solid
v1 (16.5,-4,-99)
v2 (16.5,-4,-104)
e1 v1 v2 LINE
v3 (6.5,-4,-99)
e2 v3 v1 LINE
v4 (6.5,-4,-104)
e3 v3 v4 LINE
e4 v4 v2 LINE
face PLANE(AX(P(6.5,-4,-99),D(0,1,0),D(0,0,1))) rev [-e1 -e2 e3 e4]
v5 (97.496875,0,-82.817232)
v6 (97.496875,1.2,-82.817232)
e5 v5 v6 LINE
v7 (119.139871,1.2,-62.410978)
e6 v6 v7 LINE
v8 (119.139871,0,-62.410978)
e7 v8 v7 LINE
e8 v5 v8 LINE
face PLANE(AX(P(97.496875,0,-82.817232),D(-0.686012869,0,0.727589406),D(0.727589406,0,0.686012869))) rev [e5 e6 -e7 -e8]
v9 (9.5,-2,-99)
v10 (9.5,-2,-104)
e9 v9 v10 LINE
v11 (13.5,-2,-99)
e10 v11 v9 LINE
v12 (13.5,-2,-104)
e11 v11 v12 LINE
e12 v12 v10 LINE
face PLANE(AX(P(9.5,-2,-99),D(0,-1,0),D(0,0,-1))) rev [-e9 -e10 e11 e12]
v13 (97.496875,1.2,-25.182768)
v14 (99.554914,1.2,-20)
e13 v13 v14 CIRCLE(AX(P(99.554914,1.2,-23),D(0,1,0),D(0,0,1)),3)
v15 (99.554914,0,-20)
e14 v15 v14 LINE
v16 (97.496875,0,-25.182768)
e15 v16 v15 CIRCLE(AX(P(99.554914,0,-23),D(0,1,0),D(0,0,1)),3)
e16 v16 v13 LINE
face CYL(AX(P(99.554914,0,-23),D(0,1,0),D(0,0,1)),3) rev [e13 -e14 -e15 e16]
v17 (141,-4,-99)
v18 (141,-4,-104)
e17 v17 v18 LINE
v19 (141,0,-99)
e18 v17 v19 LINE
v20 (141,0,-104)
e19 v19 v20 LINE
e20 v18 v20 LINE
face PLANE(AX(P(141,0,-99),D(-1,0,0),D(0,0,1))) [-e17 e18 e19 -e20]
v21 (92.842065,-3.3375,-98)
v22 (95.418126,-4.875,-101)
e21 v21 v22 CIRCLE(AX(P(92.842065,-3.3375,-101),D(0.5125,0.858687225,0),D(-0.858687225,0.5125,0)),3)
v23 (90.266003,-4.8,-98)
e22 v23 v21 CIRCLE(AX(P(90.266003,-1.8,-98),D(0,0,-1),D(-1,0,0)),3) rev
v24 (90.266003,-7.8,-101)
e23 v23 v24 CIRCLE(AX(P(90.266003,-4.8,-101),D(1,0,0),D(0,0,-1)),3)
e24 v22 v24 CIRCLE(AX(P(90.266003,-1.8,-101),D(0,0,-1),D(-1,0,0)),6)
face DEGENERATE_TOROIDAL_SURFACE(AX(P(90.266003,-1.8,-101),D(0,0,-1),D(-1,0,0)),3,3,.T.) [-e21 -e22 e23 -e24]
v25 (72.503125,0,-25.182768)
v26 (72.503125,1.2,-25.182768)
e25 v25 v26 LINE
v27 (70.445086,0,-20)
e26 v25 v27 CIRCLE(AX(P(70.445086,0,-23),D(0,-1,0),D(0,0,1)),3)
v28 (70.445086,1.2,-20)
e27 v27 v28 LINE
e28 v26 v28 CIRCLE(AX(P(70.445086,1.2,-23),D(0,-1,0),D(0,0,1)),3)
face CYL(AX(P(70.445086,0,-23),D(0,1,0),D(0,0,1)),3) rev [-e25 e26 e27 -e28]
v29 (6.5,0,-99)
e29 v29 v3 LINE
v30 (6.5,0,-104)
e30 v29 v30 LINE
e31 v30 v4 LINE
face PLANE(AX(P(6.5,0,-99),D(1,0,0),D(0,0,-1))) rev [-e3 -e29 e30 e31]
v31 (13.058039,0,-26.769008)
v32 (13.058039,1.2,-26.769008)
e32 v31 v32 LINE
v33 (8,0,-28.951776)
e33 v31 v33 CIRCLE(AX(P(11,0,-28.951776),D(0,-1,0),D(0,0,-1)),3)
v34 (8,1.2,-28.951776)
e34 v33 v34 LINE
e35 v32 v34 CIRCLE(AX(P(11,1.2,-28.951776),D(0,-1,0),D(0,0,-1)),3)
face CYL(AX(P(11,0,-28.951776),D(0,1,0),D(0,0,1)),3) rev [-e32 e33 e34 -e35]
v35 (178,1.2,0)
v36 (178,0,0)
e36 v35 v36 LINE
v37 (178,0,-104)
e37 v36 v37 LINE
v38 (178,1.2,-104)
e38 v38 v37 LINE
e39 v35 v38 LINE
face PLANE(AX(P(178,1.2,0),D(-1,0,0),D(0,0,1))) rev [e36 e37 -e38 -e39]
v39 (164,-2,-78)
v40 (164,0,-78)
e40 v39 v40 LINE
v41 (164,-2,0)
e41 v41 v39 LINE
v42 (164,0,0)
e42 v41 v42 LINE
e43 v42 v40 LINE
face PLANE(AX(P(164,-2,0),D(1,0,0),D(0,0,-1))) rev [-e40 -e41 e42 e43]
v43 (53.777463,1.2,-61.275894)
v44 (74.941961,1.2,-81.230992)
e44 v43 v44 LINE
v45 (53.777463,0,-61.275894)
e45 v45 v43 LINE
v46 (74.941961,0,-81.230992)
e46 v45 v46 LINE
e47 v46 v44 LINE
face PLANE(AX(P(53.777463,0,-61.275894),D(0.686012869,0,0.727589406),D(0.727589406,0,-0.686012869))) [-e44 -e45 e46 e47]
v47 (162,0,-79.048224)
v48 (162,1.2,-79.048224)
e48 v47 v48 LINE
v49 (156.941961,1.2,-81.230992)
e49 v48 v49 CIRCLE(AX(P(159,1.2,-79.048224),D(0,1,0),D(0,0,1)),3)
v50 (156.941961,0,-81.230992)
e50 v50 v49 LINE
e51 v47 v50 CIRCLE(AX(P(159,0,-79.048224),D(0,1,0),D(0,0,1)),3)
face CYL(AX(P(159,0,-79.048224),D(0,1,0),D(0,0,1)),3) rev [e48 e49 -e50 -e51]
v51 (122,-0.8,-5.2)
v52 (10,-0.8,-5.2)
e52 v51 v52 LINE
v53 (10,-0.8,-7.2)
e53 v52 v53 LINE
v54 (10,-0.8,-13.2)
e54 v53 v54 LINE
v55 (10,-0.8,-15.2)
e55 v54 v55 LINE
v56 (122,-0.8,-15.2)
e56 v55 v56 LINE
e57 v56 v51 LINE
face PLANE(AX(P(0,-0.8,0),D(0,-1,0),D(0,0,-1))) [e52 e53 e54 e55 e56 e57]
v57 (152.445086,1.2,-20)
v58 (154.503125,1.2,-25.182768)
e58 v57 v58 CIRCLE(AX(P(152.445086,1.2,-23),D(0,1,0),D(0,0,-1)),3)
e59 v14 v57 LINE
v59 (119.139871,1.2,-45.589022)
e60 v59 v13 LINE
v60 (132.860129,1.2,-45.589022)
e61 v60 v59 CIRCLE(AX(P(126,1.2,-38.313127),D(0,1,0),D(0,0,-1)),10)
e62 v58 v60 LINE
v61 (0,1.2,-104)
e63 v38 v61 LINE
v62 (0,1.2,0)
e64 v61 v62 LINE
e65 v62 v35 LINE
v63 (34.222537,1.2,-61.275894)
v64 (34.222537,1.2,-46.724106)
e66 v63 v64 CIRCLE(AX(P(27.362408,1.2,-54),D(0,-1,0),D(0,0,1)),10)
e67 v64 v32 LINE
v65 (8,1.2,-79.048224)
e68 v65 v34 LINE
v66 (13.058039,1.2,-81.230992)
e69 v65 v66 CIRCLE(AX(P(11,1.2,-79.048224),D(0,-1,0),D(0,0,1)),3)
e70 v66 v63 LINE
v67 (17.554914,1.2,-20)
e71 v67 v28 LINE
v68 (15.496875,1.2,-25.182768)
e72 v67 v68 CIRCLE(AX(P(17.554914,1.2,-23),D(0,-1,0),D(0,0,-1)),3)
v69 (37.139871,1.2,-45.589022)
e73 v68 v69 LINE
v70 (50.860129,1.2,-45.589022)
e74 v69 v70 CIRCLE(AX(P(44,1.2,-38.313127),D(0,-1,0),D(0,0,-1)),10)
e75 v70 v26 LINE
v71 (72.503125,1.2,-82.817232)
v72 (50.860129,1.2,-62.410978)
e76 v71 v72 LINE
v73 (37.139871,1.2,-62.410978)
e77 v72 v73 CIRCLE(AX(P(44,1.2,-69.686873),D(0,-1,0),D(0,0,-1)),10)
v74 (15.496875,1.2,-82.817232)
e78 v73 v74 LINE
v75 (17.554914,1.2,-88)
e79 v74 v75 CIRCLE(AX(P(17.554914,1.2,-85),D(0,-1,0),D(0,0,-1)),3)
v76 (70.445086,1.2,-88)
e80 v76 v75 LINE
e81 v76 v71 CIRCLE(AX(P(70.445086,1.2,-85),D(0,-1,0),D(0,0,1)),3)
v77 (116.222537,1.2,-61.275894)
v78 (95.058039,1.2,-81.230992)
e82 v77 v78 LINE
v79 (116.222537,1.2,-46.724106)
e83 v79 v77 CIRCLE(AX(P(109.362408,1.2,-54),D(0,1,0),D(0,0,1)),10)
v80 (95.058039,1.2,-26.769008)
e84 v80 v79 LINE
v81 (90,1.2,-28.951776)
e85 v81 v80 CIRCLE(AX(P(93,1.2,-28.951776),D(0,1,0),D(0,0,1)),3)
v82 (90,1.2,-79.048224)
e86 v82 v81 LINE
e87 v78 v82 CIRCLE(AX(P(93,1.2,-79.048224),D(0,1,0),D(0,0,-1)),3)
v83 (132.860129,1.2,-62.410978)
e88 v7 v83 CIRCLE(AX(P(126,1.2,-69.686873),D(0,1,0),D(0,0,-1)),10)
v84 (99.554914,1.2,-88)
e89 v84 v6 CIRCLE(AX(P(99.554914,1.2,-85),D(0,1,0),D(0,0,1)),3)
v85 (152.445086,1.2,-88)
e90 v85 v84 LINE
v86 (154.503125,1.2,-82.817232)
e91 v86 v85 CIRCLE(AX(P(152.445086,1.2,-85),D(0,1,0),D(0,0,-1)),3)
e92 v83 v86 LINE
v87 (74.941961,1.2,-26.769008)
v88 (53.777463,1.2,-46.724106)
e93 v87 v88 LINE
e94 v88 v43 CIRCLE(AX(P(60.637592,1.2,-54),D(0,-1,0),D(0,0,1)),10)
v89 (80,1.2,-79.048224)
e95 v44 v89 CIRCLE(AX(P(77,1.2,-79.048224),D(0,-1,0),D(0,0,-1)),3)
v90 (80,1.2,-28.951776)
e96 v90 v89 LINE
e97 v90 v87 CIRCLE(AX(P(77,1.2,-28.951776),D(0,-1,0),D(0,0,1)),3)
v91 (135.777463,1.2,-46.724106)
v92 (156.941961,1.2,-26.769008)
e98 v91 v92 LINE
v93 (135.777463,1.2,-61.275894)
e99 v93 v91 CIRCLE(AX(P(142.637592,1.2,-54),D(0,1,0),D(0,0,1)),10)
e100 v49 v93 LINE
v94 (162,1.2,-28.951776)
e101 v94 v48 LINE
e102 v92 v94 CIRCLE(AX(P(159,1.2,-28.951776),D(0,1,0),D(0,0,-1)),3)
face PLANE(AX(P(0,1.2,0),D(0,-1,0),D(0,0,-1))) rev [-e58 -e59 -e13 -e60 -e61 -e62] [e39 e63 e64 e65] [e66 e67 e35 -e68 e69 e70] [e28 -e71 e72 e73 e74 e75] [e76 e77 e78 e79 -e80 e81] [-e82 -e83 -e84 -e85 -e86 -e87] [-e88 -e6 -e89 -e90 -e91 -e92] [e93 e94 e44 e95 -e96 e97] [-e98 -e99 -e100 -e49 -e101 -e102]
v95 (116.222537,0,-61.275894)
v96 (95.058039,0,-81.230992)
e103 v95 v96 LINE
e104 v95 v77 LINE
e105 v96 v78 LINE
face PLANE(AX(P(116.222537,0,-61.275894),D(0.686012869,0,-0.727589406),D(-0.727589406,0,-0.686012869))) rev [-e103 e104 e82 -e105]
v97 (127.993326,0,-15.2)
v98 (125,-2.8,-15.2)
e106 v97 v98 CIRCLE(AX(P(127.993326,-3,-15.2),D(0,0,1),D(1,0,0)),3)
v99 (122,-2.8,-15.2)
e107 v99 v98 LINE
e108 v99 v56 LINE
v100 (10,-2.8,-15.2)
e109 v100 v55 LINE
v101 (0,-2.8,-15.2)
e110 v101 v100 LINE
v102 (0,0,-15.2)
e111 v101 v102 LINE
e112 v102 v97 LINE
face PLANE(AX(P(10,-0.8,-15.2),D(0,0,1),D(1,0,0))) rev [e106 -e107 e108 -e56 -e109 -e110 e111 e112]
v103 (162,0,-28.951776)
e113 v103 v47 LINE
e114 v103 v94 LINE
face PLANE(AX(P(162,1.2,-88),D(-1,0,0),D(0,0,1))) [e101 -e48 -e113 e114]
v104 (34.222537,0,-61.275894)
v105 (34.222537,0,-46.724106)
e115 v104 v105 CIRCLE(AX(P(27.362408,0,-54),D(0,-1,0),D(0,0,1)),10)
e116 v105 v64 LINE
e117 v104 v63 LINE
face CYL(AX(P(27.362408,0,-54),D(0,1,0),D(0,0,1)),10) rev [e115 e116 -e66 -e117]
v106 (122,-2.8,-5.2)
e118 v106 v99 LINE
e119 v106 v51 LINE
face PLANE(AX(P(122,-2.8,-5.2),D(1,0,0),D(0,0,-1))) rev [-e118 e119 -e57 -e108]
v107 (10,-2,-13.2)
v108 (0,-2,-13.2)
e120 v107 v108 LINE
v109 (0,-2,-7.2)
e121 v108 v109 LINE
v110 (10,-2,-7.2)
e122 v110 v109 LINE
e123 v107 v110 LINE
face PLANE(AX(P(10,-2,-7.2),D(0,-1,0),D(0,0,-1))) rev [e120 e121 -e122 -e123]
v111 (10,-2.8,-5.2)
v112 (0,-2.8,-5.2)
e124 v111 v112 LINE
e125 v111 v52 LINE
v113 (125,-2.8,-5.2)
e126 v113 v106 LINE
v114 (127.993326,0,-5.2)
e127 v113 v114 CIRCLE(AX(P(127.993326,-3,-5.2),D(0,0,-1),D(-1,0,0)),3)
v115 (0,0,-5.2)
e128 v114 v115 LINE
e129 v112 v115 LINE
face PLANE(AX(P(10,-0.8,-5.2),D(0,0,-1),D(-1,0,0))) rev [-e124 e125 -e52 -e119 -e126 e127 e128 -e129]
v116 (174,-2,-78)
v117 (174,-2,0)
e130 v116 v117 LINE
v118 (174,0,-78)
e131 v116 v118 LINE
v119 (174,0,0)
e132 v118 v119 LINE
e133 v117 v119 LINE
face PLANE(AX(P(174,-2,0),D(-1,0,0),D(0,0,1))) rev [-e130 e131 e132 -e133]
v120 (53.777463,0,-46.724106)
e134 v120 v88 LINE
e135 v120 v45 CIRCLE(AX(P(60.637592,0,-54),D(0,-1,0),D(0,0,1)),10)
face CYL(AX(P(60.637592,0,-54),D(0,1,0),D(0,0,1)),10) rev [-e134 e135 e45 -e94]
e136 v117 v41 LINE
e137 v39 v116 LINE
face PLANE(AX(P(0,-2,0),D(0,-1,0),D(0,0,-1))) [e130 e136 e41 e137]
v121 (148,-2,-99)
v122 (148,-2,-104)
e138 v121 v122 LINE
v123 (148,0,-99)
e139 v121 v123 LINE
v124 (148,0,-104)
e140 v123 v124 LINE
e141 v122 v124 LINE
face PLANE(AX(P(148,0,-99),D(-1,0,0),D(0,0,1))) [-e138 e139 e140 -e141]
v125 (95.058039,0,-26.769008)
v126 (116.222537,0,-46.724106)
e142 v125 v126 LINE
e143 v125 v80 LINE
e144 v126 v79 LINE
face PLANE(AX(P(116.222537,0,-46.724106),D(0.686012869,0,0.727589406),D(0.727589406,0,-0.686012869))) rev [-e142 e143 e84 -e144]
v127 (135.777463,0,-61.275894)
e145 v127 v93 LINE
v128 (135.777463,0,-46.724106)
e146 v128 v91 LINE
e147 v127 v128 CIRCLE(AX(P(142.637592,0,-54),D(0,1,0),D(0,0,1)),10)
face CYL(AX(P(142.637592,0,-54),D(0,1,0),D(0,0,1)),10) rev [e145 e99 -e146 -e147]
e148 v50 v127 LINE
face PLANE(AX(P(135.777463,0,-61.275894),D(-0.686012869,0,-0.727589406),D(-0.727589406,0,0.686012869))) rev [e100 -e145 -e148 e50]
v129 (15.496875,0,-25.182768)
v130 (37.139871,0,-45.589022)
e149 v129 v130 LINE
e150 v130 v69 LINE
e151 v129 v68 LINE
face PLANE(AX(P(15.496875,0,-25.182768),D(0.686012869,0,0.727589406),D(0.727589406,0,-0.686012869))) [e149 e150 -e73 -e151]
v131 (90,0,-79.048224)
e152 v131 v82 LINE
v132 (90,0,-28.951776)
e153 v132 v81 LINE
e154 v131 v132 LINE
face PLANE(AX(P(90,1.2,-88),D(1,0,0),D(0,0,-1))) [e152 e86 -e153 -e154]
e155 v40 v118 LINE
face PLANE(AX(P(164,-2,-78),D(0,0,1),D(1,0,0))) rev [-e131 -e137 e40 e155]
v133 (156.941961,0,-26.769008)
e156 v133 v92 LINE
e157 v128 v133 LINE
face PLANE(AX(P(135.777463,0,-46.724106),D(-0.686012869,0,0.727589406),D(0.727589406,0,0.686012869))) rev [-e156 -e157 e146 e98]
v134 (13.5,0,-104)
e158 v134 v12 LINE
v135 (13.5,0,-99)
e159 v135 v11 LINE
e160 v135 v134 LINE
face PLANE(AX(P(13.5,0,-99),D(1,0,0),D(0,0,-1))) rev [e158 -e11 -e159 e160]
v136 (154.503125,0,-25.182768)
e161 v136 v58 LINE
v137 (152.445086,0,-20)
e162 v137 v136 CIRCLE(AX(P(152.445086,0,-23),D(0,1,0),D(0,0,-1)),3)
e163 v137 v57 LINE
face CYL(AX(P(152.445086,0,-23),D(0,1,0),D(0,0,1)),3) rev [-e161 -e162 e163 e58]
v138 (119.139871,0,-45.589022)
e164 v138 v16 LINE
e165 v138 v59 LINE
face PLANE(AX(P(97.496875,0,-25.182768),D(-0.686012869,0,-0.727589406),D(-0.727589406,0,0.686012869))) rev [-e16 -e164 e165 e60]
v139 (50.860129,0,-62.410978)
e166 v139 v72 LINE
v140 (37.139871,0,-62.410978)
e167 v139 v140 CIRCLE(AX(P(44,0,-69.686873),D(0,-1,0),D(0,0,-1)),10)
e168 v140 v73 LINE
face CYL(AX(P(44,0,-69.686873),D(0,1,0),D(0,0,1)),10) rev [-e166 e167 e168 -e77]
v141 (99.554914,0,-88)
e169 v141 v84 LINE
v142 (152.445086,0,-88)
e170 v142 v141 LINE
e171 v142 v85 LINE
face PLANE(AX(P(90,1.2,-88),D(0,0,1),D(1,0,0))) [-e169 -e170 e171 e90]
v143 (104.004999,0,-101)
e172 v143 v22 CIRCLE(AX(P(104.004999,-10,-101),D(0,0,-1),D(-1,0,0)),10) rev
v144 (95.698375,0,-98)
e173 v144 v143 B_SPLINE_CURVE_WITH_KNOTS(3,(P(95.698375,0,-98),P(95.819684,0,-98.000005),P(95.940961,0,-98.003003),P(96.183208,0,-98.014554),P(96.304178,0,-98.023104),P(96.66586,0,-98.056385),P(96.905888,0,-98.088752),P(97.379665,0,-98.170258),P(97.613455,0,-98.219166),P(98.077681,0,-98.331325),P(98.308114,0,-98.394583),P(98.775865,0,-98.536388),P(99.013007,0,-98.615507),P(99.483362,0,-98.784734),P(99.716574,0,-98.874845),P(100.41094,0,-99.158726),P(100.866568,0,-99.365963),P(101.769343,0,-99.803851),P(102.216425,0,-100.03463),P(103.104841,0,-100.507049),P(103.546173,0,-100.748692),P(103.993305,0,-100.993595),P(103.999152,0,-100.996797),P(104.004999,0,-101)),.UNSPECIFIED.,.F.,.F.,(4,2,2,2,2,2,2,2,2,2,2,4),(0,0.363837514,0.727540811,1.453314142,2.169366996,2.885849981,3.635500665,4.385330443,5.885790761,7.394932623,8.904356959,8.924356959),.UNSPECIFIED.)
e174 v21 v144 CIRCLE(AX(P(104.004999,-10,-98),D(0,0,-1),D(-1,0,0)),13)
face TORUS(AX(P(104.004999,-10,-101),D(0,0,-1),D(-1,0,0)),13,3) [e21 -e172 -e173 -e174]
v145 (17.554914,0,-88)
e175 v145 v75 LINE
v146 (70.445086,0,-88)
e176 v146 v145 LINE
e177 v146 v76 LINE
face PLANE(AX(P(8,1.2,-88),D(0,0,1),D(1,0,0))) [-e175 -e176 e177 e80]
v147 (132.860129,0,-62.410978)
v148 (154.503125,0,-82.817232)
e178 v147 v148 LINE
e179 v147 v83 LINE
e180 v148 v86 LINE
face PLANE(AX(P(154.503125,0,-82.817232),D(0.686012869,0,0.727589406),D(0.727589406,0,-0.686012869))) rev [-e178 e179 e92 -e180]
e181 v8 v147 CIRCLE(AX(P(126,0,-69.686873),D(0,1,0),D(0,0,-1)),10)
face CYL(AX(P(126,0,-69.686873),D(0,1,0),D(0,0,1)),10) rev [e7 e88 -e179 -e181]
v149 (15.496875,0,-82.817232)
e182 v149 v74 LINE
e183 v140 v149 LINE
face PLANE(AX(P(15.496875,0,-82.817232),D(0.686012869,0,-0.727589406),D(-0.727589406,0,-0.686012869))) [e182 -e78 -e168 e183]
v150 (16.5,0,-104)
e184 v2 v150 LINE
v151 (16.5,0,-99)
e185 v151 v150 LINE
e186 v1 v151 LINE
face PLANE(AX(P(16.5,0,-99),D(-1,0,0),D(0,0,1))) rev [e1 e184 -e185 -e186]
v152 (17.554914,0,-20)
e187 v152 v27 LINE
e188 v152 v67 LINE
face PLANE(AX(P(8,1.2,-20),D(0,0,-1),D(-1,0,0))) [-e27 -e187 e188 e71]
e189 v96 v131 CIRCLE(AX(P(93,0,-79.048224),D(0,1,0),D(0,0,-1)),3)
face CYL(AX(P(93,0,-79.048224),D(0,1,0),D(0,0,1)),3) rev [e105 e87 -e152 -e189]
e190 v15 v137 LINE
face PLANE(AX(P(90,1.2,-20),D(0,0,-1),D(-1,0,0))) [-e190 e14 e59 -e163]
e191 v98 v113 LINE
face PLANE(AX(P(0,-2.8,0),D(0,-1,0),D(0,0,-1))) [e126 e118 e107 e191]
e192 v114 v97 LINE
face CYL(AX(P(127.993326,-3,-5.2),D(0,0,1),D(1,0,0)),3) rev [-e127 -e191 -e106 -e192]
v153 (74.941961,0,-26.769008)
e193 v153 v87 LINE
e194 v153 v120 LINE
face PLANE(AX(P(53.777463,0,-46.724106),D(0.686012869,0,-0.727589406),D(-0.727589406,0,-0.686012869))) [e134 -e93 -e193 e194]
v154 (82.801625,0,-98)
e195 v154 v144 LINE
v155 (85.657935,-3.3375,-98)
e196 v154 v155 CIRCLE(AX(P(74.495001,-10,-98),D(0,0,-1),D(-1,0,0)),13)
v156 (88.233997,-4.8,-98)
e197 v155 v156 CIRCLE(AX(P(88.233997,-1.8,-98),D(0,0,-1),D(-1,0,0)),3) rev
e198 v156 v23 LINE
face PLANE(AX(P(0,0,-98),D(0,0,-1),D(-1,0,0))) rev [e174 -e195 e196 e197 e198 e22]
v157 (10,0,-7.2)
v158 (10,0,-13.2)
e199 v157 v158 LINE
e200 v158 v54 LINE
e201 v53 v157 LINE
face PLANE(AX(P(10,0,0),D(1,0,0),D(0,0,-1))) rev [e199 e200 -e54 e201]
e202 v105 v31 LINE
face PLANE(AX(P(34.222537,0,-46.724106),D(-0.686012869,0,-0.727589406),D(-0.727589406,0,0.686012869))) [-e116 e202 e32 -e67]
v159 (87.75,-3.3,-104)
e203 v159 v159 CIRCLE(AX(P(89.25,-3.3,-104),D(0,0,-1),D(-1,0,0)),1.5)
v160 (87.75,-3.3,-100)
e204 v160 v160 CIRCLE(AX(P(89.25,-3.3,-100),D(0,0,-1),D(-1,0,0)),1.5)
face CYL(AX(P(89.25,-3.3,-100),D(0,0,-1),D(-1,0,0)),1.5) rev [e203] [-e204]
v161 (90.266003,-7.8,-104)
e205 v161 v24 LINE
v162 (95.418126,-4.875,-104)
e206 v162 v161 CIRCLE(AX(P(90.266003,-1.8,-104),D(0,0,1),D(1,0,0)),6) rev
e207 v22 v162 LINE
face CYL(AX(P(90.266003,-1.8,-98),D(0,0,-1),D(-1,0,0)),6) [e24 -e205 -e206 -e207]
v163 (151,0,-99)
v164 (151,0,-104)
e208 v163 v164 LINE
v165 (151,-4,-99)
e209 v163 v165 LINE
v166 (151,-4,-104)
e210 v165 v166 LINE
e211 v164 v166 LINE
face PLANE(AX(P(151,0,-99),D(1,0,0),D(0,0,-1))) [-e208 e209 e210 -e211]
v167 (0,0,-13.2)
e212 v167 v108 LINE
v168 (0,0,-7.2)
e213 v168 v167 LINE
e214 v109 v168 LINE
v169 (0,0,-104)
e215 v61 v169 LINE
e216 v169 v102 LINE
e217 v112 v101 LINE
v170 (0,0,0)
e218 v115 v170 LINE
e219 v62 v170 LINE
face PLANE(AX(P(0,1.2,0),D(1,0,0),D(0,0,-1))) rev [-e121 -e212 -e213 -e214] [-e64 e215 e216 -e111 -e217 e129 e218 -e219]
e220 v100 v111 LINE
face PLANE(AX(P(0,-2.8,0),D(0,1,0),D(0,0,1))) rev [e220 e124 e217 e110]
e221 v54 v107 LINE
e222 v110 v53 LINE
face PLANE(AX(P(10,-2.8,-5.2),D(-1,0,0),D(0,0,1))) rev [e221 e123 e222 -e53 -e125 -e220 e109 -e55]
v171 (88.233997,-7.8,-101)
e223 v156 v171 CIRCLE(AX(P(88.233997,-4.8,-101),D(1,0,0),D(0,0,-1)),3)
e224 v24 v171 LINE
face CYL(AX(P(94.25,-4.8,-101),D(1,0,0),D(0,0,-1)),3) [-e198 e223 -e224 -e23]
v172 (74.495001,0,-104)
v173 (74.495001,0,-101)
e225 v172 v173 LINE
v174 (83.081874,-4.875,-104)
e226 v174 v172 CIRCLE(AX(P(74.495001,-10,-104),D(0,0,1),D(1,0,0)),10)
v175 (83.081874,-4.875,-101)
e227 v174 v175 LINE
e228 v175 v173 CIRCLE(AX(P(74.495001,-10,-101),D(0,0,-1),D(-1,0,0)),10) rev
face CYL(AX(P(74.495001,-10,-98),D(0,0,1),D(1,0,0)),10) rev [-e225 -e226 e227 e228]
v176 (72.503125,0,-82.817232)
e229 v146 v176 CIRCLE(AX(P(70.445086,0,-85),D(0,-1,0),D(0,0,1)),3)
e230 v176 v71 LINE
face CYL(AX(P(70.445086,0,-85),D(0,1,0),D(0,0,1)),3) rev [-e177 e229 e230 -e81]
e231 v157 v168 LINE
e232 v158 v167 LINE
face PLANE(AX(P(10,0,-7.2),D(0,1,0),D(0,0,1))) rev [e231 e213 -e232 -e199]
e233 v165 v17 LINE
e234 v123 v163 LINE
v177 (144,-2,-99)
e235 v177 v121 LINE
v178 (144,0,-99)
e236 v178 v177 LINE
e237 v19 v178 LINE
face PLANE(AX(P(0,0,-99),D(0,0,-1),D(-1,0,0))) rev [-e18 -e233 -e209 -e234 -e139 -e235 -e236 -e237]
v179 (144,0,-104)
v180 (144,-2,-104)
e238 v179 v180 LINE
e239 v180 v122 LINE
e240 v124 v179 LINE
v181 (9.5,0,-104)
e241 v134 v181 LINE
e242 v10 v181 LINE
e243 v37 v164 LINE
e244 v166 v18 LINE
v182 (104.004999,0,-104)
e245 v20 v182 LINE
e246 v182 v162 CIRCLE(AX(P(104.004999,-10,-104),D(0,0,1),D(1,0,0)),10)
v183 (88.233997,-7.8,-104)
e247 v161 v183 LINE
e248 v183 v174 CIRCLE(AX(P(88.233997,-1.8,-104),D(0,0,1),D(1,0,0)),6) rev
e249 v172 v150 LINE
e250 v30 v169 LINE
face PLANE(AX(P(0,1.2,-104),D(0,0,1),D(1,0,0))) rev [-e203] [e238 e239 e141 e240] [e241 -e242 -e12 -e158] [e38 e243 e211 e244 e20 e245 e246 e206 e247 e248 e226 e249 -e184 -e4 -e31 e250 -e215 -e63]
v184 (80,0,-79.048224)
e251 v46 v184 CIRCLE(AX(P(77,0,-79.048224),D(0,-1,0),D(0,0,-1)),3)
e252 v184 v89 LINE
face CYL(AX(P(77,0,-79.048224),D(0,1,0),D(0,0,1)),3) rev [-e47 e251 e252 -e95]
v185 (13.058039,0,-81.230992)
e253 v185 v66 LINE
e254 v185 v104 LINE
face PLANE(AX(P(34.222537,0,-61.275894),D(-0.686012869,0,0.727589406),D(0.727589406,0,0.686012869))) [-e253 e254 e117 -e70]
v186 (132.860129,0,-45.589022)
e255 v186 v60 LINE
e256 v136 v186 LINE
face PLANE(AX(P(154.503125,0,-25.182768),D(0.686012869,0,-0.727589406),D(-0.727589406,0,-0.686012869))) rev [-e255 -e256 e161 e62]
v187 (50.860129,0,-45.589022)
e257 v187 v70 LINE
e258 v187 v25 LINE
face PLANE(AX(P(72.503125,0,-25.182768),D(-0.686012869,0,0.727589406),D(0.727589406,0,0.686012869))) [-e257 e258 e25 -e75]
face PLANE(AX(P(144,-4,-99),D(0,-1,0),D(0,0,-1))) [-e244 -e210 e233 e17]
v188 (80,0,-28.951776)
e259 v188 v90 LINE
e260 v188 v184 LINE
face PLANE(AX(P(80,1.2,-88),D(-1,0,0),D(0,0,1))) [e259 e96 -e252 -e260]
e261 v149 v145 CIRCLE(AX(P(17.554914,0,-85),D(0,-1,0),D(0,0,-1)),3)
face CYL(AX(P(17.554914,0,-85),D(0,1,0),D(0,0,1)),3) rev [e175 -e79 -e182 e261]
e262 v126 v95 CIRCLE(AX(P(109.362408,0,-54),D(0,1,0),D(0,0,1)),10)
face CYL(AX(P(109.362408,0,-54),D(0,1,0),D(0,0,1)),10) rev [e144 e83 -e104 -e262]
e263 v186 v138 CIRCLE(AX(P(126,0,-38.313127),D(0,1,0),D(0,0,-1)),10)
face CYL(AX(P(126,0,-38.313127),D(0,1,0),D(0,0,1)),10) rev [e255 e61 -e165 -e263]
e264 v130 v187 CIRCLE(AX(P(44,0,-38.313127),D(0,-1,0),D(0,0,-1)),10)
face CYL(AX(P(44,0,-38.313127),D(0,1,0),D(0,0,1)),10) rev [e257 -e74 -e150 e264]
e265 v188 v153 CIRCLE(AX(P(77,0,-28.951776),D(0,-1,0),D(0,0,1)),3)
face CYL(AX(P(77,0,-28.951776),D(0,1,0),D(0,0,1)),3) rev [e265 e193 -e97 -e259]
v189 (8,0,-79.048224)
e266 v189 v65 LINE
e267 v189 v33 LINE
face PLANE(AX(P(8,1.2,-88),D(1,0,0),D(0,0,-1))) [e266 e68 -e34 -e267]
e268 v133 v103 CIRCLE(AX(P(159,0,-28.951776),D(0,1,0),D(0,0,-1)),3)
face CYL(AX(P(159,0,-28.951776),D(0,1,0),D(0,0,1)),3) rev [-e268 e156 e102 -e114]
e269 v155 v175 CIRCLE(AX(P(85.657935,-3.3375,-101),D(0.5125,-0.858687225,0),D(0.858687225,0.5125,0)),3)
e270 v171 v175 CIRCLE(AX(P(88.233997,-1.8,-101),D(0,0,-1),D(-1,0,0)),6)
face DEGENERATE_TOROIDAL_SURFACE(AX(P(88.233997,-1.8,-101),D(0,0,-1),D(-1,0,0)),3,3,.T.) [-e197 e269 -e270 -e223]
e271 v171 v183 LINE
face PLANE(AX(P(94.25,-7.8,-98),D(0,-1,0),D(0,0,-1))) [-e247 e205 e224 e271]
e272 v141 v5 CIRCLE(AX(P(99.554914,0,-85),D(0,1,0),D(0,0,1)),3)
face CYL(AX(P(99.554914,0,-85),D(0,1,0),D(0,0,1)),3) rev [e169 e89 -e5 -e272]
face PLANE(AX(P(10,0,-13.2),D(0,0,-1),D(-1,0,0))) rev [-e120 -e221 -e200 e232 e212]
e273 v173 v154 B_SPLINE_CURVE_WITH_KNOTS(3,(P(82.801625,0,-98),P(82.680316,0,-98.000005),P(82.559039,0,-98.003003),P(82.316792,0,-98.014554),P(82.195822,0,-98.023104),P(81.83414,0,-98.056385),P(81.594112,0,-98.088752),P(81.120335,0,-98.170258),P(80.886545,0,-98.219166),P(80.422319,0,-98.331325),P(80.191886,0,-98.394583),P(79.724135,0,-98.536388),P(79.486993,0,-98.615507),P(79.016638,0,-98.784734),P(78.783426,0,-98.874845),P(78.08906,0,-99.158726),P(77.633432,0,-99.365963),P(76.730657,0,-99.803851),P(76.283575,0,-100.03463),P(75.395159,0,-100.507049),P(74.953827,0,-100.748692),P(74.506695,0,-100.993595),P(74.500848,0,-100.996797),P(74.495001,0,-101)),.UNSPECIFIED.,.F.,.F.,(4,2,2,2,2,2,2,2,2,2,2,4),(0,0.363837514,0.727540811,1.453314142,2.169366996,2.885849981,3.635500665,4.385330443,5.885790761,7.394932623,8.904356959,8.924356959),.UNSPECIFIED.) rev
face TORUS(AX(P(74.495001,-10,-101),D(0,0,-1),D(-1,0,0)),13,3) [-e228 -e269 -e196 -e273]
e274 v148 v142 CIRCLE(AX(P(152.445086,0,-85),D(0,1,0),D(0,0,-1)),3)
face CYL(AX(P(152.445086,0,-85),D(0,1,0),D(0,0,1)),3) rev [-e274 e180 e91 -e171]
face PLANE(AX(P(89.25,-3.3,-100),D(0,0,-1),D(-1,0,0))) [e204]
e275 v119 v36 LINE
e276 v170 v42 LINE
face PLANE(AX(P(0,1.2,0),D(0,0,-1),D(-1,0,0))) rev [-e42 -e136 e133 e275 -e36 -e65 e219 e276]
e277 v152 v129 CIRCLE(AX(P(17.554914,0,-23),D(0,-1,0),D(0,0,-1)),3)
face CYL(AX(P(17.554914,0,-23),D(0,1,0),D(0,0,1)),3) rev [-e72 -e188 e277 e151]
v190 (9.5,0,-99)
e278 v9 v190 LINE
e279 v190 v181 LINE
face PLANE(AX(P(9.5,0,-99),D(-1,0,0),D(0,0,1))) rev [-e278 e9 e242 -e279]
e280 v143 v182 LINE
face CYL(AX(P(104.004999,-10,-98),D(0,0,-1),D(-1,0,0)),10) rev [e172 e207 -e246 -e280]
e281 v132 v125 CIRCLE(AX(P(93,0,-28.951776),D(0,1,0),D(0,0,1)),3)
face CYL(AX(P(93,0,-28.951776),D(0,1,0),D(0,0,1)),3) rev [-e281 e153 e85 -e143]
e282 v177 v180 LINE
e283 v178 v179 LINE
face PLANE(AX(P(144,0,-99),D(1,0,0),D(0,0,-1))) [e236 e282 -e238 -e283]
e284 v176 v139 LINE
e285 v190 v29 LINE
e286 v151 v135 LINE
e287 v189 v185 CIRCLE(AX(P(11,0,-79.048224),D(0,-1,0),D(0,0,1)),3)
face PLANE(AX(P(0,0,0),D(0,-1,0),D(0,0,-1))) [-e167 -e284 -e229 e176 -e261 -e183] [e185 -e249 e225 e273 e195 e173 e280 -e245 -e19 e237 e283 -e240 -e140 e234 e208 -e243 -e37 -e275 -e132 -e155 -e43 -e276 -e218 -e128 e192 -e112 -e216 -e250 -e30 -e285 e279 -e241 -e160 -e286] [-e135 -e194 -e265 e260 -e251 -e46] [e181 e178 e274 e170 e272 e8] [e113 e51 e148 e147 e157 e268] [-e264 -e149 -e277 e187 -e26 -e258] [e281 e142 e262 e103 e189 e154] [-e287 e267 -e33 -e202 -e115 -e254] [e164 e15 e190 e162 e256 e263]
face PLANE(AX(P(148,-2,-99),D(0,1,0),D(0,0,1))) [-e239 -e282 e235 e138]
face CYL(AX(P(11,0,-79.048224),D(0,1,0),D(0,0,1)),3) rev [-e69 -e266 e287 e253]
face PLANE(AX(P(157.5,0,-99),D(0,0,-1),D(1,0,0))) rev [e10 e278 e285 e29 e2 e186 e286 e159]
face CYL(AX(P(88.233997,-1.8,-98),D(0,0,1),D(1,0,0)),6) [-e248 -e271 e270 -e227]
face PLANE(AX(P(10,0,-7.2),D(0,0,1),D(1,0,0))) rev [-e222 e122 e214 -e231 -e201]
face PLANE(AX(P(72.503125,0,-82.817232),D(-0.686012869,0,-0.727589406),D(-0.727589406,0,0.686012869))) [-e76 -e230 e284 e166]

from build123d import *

# Parameters (mm, degrees)
SKETCH1_W           = 178
SKETCH1_H           = 104
SKETCH1_W_2         = 72
SKETCH1_H_2         = 68
BOSS_EXTRUDE1_DEPTH = 1.2
BOSS_EXTRUDE2_DEPTH = 5
SKETCH3_W           = 112
SKETCH3_H           = 10
BOSS_EXTRUDE3_DEPTH = 0.8
SKETCH4_W           = 10
SKETCH4_H           = 10
BOSS_EXTRUDE4_DEPTH = 2.8
SKETCH5_W           = 6
SKETCH5_H           = 2
CUT_EXTRUDE1_DEPTH  = 10
SKETCH6_W           = 10
SKETCH6_H           = 7.8
BOSS_EXTRUDE5_DEPTH = 6
FILLET1_R           = 10
FILLET2_R           = 6
SKETCH7_R           = 1.5
CUT_EXTRUDE2_DEPTH  = 4
FILLET3_R           = 3
SKETCH8_W           = 3
SKETCH8_H           = 10
BOSS_EXTRUDE6_DEPTH = 2.8
FILLET4_R           = 3
SKETCH9_W           = 10
SKETCH9_H           = 78
BOSS_EXTRUDE7_DEPTH = 2
BOSS_EXTRUDE8_DEPTH = 1.2


with BuildPart() as part:
    # Sketch1 → Boss-Extrude1 (new body)
    with BuildSketch(Plane(origin=(0, 0, 0), x_dir=(1, 0, 0), z_dir=(0, 1, 0))):
        with Locations((89, 52)):
            Rectangle(SKETCH1_W, SKETCH1_H)
        with Locations((126, 54)):
            Rectangle(SKETCH1_W_2, SKETCH1_H_2, mode=Mode.SUBTRACT)
        with Locations((44, 54)):
            Rectangle(SKETCH1_W_2, SKETCH1_H_2, mode=Mode.SUBTRACT)
    extrude(amount=BOSS_EXTRUDE1_DEPTH)

    # Sketch2 → Boss-Extrude2 (add)
    with BuildSketch(Plane(origin=(0, 0, -104), x_dir=(-1, 0, 0), z_dir=(0, 0, -1))):
        Polygon((-151, 0), (-148, 0), (-148, -2), (-144, -2), (-144, 0), (-141, 0), (-141, -4), (-144, -4), (-148, -4), (-151, -4), align=None)
    boss_extrude2 = extrude(amount=-BOSS_EXTRUDE2_DEPTH)

    # Mirror1: Boss-Extrude2 across plane
    add(boss_extrude2.mirror(Plane.ZY.offset(-78.75)))

    # Sketch3 → Boss-Extrude3 (add)
    with BuildSketch(Plane.XZ):
        with Locations((66, -10.2)):
            Rectangle(SKETCH3_W, SKETCH3_H)
    extrude(amount=BOSS_EXTRUDE3_DEPTH)

    # Sketch4 → Boss-Extrude4 (add)
    with BuildSketch(Plane.XZ):
        with Locations((5, -10.2)):
            Rectangle(SKETCH4_W, SKETCH4_H)
    extrude(amount=BOSS_EXTRUDE4_DEPTH)

    # Sketch5 → Cut-Extrude1 (cut)
    with BuildSketch(Plane.ZY):
        with Locations((-10.2, -1)):
            Rectangle(SKETCH5_W, SKETCH5_H)
    extrude(amount=-CUT_EXTRUDE1_DEPTH, mode=Mode.SUBTRACT)

    # Sketch6 → Boss-Extrude5 (add)
    with BuildSketch(Plane(origin=(0, 0, -104), x_dir=(-1, 0, 0), z_dir=(0, 0, -1))):
        with Locations((-89.25, -3.9)):
            Rectangle(SKETCH6_W, SKETCH6_H)
    extrude(amount=-BOSS_EXTRUDE5_DEPTH)

    # Fillet1
    # the kernel refuses this fillet: 10 mm, written as the material it adds along each edge
    with BuildSketch(Plane(origin=(94.25, 0, -104), x_dir=(1, 0, 0), z_dir=(0, 0, 1))) as fillet1_piece_1:
        with BuildLine():
            CenterArc((9.754998719, -10), FILLET1_R, 90, 77.290967006)
            Line((0, -7.8), (0, 0))
            Line((0, 0), (9.754998719, 0))
        make_face()
    extrude(amount=6)
    with BuildSketch(Plane(origin=(84.25, 0, -104), x_dir=(-1, 0, 0), z_dir=(0, 0, 1))) as fillet1_piece_2:
        with BuildLine():
            CenterArc((9.754998719, 10), FILLET1_R, 192.709032994, 77.290967006)
            Line((0, 7.8), (0, 0))
            Line((0, 0), (9.754998719, 0))
        make_face()
    extrude(amount=6)

    # Fillet2
    fillet2_edges = [part.edges().sort_by_distance(p)[0] for p in [
        (94.25, -7.8, -101),
        (84.25, -7.8, -101),
    ]]
    fillet(fillet2_edges, radius=FILLET2_R)

    # Sketch7 → Cut-Extrude2 (cut)
    with BuildSketch(Plane(origin=(0, 0, -104), x_dir=(-1, 0, 0), z_dir=(0, 0, -1))):
        with Locations((-89.25, -3.3)):
            Circle(SKETCH7_R)
    extrude(amount=-CUT_EXTRUDE2_DEPTH, mode=Mode.SUBTRACT)

    # Fillet3
    fillet3_edges = [part.edges().sort_by_distance(p)[0] for p in [
        (79.432105696, -1.303736435, -98),
        (99.067894304, -1.303736435, -98),
        (89.25, -7.8, -98),
        (85.271734229, -7.017758139, -98),
        (93.228265771, -7.017758139, -98),
    ]]
    fillet(fillet3_edges, radius=FILLET3_R)

    # Sketch8 → Boss-Extrude6 (add)
    with BuildSketch(Plane.XZ):
        with Locations((123.5, -10.2)):
            Rectangle(SKETCH8_W, SKETCH8_H)
    extrude(amount=BOSS_EXTRUDE6_DEPTH)

    # Fillet4
    # the kernel refuses this fillet: 3 mm, written as the material it adds along each edge
    with BuildSketch(Plane(origin=(125, 0, -5.2), x_dir=(1, 0, 0), z_dir=(0, 0, -1))) as fillet4_piece_1:
        with BuildLine():
            CenterArc((2.993325909, 3), FILLET4_R, 183.822553729, 86.177446271)
            Line((0, 2.8), (-0.059866518, 2.796))
            ThreePointArc((-0.059866518, 2.796), (-0.06, 1.4), (-0.06, 0))
            Line((-0.06, 0), (0, -0.06))
            Line((0, -0.06), (2.993325909, -0.06))
            Line((2.993325909, -0.06), (2.993325909, 0))
        make_face()
    extrude(amount=10)

    # Sketch9 → Boss-Extrude7 (add)
    with BuildSketch(Plane.XZ):
        with Locations((169, -39)):
            Rectangle(SKETCH9_W, SKETCH9_H)
    extrude(amount=BOSS_EXTRUDE7_DEPTH)

    # Sketch10 → Boss-Extrude8 (add)
    with BuildSketch(Plane(origin=(0, 1.2, 0), x_dir=(1, 0, 0), z_dir=(0, 1, 0))):
        with BuildLine():
            Line((15.496875383, 82.817231781), (37.139871313, 62.410978476))
            ThreePointArc((37.139871313, 62.410978476), (44, 59.686872538), (50.860128687, 62.410978476))
            Line((50.860128687, 62.410978476), (72.503124617, 82.817231781))
            ThreePointArc((72.503124617, 82.817231781), (73.233302704, 86.107180054), (70.445086011, 88))
            Line((70.445086011, 88), (53.755491102, 88))
            Line((53.755491102, 88), (53.755491102, 92.773114393))
            Line((53.755491102, 92.773114393), (83.607486332, 92.773114393))
            Line((83.607486332, 92.773114393), (83.607486332, 57.500394296))
            Line((83.607486332, 57.500394296), (80, 57.500394296))
            Line((80, 57.500394296), (80, 79.048223953))
            ThreePointArc((80, 79.048223953), (78.188672407, 81.802685408), (74.941961394, 81.230992171))
            Line((74.941961394, 81.230992171), (53.777463399, 61.275894062))
            ThreePointArc((53.777463399, 61.275894062), (50.637592086, 54), (53.777463399, 46.724105938))
            Line((53.777463399, 46.724105938), (74.941961394, 26.769007829))
            ThreePointArc((74.941961394, 26.769007829), (78.188672407, 26.197314592), (80, 28.951776047))
            Line((80, 28.951776047), (80, 51.757328614))
            Line((80, 51.757328614), (83.607486332, 51.757328614))
            Line((83.607486332, 51.757328614), (83.607486332, 17.03280878))
            Line((83.607486332, 17.03280878), (48.474442735, 17.03280878))
            Line((48.474442735, 17.03280878), (48.474442735, 20))
            Line((48.474442735, 20), (70.445086011, 20))
            ThreePointArc((70.445086011, 20), (73.233302704, 21.892819946), (72.503124617, 25.182768219))
            Line((72.503124617, 25.182768219), (50.860128687, 45.589021524))
            ThreePointArc((50.860128687, 45.589021524), (44, 48.313127462), (37.139871313, 45.589021524))
            Line((37.139871313, 45.589021524), (15.496875383, 25.182768219))
            ThreePointArc((15.496875383, 25.182768219), (14.766697296, 21.892819946), (17.554913989, 20))
            Line((17.554913989, 20), (45.016619204, 20))
            Line((45.016619204, 20), (45.016619204, 17.03280878))
            Line((45.016619204, 17.03280878), (3.455124081, 17.03280878))
            Line((3.455124081, 17.03280878), (3.455124081, 51.757328614))
            Line((3.455124081, 51.757328614), (8, 51.757328614))
            Line((8, 51.757328614), (8, 28.951776047))
            ThreePointArc((8, 28.951776047), (9.811327593, 26.197314592), (13.058038606, 26.769007829))
            Line((13.058038606, 26.769007829), (34.222536601, 46.724105938))
            ThreePointArc((34.222536601, 46.724105938), (37.362407914, 54), (34.222536601, 61.275894062))
            Line((34.222536601, 61.275894062), (13.058038606, 81.230992171))
            ThreePointArc((13.058038606, 81.230992171), (9.811327593, 81.802685408), (8, 79.048223953))
            Line((8, 79.048223953), (8, 56.332794756))
            Line((8, 56.332794756), (3.455124081, 56.332794756))
            Line((3.455124081, 56.332794756), (3.455124081, 92.773114393))
            Line((3.455124081, 92.773114393), (41.529538769, 92.773114393))
            Line((41.529538769, 92.773114393), (41.529538769, 88))
            Line((41.529538769, 88), (17.554913989, 88))
            ThreePointArc((17.554913989, 88), (14.766697296, 86.107180054), (15.496875383, 82.817231781))
        make_face()
    boss_extrude8 = extrude(amount=-BOSS_EXTRUDE8_DEPTH)

    # Mirror2: Boss-Extrude8 across plane
    add(boss_extrude8.mirror(Plane(origin=(85, 0, 0), x_dir=(0, 0, 1), z_dir=(1, 0, 0))))


solid = part.part
